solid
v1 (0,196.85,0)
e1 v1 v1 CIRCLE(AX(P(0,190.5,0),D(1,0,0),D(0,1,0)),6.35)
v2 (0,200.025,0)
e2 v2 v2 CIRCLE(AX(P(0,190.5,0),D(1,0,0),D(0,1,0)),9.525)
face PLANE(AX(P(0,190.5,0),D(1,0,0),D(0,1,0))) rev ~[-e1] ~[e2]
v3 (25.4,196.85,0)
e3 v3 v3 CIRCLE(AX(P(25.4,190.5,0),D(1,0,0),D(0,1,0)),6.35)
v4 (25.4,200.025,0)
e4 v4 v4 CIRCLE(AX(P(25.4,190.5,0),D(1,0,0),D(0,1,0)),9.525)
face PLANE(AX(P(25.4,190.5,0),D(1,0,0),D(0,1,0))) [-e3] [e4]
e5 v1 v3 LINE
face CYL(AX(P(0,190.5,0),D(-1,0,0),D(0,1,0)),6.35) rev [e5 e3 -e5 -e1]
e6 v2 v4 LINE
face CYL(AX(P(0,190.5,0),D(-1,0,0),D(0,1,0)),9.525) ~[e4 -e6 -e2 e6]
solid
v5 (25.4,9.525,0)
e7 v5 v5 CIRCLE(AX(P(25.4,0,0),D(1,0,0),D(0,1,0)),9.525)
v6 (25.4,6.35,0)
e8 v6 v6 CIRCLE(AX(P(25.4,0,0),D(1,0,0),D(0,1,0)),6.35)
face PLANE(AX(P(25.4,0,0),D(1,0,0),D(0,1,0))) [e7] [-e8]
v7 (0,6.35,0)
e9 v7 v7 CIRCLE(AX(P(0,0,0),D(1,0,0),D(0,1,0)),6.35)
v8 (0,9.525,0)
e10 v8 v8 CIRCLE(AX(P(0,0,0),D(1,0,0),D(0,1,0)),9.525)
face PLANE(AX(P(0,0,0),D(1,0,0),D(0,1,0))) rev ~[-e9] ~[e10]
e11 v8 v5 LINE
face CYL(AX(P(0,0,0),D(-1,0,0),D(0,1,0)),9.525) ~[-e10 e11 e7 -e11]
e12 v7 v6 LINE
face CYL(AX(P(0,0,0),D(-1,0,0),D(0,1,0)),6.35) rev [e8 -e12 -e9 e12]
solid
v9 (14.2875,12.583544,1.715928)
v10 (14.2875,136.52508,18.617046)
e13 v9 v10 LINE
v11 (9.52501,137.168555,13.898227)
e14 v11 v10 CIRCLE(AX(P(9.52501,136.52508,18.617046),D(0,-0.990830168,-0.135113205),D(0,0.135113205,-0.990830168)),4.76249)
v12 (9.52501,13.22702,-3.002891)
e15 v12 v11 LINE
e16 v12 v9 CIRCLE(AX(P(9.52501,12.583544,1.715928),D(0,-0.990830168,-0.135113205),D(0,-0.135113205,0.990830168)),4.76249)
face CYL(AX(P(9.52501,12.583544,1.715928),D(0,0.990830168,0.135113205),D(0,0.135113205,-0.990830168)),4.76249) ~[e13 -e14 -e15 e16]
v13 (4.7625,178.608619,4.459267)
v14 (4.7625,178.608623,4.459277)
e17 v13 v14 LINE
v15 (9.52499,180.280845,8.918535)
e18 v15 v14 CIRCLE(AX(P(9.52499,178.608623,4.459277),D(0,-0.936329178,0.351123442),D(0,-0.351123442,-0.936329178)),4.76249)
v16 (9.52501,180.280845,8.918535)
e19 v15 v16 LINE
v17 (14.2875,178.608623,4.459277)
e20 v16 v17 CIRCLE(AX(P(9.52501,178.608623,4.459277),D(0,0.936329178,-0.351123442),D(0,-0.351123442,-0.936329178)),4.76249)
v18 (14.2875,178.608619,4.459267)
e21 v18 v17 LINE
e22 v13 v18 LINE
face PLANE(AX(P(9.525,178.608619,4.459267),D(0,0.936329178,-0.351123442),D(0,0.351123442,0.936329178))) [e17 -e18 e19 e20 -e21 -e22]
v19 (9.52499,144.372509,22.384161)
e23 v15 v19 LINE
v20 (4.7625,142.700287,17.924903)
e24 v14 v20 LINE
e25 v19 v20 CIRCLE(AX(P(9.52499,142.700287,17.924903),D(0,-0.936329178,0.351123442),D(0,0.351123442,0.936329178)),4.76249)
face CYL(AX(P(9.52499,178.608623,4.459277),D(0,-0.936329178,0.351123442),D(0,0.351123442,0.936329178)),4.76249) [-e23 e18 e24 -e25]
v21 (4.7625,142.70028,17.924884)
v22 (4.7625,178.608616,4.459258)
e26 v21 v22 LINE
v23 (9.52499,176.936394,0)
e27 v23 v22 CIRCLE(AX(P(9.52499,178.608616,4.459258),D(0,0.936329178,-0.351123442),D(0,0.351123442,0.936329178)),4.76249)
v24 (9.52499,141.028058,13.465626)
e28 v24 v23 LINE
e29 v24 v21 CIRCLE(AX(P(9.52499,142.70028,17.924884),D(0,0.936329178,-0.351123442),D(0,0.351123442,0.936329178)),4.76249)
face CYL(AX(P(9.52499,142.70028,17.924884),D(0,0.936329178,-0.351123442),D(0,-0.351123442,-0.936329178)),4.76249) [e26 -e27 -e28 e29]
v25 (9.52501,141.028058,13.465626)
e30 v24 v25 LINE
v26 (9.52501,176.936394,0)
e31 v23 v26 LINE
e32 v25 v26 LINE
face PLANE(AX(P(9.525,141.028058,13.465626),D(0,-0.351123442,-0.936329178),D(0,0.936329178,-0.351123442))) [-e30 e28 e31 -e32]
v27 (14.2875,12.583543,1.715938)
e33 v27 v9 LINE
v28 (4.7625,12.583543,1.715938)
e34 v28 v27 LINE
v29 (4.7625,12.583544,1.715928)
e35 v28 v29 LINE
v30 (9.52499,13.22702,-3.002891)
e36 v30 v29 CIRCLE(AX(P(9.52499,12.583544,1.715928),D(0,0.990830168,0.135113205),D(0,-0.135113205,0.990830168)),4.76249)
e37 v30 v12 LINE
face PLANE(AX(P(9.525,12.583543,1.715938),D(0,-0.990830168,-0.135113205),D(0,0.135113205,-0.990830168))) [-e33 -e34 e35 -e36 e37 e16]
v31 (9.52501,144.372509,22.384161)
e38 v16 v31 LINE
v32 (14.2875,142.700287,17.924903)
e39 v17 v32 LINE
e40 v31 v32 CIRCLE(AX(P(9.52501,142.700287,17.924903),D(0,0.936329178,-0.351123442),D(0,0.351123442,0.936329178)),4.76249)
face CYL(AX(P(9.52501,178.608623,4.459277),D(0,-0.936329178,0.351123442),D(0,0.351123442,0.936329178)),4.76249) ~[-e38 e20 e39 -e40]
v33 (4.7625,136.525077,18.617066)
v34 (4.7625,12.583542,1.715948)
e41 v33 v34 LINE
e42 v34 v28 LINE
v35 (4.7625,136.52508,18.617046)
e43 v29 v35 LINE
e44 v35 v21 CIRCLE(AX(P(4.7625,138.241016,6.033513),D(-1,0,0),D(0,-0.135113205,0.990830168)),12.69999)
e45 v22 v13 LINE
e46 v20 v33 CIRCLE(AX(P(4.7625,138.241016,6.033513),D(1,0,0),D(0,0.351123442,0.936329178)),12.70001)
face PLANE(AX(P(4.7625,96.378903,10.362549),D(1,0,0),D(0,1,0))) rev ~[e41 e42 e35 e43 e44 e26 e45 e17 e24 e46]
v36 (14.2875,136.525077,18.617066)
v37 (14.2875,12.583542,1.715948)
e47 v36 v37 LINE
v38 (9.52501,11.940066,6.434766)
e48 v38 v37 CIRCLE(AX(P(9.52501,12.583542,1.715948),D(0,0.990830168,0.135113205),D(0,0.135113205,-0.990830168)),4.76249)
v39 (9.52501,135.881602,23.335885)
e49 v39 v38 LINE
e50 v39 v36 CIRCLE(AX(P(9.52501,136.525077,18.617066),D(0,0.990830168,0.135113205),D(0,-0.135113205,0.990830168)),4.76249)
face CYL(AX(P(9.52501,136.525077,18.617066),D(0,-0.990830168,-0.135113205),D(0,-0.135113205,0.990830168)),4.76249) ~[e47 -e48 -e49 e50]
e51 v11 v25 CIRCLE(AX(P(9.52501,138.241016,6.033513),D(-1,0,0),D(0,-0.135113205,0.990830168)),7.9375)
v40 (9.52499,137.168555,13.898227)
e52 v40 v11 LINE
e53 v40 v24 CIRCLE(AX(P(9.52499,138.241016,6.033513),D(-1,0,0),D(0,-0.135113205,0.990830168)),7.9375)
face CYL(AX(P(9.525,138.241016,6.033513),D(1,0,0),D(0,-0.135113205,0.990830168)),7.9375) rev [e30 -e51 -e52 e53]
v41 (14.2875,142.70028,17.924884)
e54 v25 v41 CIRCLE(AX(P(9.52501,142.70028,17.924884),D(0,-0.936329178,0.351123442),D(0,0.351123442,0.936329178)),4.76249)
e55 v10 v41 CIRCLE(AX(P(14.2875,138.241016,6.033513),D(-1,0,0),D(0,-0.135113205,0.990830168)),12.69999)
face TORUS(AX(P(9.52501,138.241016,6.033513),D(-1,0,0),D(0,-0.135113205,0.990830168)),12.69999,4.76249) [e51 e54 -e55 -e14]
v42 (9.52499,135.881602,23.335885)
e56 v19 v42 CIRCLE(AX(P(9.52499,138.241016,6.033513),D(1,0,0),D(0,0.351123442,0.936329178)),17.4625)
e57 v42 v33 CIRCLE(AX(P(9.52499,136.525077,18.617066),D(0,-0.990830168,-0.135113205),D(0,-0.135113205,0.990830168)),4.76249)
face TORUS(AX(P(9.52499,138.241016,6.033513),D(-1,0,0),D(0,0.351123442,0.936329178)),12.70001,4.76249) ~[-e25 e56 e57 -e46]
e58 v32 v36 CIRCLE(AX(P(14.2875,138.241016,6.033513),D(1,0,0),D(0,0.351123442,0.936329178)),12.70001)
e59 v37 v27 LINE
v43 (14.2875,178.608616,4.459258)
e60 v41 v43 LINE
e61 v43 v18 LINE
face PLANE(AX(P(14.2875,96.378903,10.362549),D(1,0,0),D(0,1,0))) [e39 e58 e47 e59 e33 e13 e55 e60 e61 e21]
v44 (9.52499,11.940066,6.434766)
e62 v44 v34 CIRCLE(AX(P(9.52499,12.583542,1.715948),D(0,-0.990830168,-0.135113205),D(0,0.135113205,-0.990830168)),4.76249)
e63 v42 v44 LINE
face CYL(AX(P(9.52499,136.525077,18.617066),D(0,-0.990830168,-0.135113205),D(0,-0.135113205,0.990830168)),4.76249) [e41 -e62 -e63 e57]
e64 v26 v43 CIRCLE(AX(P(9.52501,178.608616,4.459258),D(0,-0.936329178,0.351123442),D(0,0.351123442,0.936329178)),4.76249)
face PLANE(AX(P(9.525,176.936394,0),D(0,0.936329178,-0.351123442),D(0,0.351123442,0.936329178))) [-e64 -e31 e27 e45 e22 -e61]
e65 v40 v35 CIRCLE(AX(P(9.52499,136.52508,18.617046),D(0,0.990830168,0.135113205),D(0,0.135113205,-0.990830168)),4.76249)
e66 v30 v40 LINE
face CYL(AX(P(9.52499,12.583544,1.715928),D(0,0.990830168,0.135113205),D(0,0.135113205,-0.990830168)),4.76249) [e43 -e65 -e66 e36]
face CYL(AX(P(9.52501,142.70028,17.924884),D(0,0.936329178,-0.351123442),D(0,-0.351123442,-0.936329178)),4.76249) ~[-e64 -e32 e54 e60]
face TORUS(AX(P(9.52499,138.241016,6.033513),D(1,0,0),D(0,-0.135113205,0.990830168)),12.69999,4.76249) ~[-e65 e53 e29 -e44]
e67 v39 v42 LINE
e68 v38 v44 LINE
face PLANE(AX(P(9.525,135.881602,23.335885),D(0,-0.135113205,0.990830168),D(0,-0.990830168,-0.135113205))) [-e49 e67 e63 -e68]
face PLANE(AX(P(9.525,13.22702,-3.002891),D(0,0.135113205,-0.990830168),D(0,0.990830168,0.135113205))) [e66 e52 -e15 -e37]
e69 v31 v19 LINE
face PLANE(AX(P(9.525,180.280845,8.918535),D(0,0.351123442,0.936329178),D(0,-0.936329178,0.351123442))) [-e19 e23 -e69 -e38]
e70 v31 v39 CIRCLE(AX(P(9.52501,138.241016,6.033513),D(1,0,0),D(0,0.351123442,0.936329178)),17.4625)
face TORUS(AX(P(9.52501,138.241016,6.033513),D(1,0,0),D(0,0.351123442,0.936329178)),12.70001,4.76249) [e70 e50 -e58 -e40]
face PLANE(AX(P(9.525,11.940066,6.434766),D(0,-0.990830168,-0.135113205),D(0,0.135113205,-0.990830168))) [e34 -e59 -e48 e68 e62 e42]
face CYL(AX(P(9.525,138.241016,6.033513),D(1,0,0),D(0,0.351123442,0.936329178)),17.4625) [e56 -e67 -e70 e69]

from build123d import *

# Parameters (mm, degrees)
F0_R     = 9.525
F0_R_2   = 6.35
F1_DEPTH = 25.4
F4_DEPTH = 4.7625
F5_R     = 4.76249


# Not quite as in the source:
# - a fillet or chamfer is up to 0.001 mm smaller than in the source, because OpenCascade refuses the exact size


with BuildPart() as f1:
    # F0 (on Right) → F1 (new body)
    with BuildSketch(Plane.YZ):
        Circle(F0_R)
        Circle(F0_R_2, mode=Mode.SUBTRACT)
    extrude(amount=F1_DEPTH)


with BuildPart() as f1b:
    # F0 (on Right) → F1, piece 2 (new body)
    with BuildSketch(Plane.YZ):
        with Locations((190.5, 0)):
            Circle(F0_R)
        with Locations((190.5, 0)):
            Circle(F0_R_2, mode=Mode.SUBTRACT)
    extrude(amount=F1_DEPTH)


with BuildPart() as f4:
    # F3 (on offset) → F4 (new body, symmetric)
    with BuildSketch(Plane.YZ.offset(9.525)):
        with BuildLine():
            Line((11.9400664966, 6.4347663754), (12.5835431405, 1.7159376536))
            Line((12.5835431405, 1.7159376536), (13.2270197717, -3.0028909752))
            Line((13.2270197717, -3.0028909752), (137.1685550482, 13.8982274716))
            ThreePointArc((137.1685550482, 13.8982274716), (139.1251729174, 13.9216162696), (141.0280584284, 13.4656258597))
            Line((141.0280584284, 13.4656258597), (176.9363940543, 0))
            Line((176.9363940543, 0), (178.6086190953, 4.4592667759))
            Line((178.6086190953, 4.4592667759), (180.2808448354, 8.9185354163))
            Line((180.2808448354, 8.9185354163), (144.3725092096, 22.3841612761))
            ThreePointArc((144.3725092096, 22.3841612761), (140.1861610854, 23.3873401779), (135.8816017732, 23.3358848222))
            Line((135.8816017732, 23.3358848222), (11.9400664966, 6.4347663754))
        make_face()
    extrude(amount=F4_DEPTH, both=True)

    # F5 (radius 4.7625 in the source; OpenCascade refuses exactly that, so slightly less here)
    f5_edges = [f4.edges().sort_by_distance(p)[0] for p in [
        (14.2875, 75.197787, 5.447668),
        (14.2875, 73.910834, 14.885326),
        (4.7625, 73.910834, 14.885326),
        (4.7625, 75.197787, 5.447668),
    ]]
    fillet(f5_edges, radius=F5_R)


solid = Compound([f1.part, f1b.part, f4.part])
